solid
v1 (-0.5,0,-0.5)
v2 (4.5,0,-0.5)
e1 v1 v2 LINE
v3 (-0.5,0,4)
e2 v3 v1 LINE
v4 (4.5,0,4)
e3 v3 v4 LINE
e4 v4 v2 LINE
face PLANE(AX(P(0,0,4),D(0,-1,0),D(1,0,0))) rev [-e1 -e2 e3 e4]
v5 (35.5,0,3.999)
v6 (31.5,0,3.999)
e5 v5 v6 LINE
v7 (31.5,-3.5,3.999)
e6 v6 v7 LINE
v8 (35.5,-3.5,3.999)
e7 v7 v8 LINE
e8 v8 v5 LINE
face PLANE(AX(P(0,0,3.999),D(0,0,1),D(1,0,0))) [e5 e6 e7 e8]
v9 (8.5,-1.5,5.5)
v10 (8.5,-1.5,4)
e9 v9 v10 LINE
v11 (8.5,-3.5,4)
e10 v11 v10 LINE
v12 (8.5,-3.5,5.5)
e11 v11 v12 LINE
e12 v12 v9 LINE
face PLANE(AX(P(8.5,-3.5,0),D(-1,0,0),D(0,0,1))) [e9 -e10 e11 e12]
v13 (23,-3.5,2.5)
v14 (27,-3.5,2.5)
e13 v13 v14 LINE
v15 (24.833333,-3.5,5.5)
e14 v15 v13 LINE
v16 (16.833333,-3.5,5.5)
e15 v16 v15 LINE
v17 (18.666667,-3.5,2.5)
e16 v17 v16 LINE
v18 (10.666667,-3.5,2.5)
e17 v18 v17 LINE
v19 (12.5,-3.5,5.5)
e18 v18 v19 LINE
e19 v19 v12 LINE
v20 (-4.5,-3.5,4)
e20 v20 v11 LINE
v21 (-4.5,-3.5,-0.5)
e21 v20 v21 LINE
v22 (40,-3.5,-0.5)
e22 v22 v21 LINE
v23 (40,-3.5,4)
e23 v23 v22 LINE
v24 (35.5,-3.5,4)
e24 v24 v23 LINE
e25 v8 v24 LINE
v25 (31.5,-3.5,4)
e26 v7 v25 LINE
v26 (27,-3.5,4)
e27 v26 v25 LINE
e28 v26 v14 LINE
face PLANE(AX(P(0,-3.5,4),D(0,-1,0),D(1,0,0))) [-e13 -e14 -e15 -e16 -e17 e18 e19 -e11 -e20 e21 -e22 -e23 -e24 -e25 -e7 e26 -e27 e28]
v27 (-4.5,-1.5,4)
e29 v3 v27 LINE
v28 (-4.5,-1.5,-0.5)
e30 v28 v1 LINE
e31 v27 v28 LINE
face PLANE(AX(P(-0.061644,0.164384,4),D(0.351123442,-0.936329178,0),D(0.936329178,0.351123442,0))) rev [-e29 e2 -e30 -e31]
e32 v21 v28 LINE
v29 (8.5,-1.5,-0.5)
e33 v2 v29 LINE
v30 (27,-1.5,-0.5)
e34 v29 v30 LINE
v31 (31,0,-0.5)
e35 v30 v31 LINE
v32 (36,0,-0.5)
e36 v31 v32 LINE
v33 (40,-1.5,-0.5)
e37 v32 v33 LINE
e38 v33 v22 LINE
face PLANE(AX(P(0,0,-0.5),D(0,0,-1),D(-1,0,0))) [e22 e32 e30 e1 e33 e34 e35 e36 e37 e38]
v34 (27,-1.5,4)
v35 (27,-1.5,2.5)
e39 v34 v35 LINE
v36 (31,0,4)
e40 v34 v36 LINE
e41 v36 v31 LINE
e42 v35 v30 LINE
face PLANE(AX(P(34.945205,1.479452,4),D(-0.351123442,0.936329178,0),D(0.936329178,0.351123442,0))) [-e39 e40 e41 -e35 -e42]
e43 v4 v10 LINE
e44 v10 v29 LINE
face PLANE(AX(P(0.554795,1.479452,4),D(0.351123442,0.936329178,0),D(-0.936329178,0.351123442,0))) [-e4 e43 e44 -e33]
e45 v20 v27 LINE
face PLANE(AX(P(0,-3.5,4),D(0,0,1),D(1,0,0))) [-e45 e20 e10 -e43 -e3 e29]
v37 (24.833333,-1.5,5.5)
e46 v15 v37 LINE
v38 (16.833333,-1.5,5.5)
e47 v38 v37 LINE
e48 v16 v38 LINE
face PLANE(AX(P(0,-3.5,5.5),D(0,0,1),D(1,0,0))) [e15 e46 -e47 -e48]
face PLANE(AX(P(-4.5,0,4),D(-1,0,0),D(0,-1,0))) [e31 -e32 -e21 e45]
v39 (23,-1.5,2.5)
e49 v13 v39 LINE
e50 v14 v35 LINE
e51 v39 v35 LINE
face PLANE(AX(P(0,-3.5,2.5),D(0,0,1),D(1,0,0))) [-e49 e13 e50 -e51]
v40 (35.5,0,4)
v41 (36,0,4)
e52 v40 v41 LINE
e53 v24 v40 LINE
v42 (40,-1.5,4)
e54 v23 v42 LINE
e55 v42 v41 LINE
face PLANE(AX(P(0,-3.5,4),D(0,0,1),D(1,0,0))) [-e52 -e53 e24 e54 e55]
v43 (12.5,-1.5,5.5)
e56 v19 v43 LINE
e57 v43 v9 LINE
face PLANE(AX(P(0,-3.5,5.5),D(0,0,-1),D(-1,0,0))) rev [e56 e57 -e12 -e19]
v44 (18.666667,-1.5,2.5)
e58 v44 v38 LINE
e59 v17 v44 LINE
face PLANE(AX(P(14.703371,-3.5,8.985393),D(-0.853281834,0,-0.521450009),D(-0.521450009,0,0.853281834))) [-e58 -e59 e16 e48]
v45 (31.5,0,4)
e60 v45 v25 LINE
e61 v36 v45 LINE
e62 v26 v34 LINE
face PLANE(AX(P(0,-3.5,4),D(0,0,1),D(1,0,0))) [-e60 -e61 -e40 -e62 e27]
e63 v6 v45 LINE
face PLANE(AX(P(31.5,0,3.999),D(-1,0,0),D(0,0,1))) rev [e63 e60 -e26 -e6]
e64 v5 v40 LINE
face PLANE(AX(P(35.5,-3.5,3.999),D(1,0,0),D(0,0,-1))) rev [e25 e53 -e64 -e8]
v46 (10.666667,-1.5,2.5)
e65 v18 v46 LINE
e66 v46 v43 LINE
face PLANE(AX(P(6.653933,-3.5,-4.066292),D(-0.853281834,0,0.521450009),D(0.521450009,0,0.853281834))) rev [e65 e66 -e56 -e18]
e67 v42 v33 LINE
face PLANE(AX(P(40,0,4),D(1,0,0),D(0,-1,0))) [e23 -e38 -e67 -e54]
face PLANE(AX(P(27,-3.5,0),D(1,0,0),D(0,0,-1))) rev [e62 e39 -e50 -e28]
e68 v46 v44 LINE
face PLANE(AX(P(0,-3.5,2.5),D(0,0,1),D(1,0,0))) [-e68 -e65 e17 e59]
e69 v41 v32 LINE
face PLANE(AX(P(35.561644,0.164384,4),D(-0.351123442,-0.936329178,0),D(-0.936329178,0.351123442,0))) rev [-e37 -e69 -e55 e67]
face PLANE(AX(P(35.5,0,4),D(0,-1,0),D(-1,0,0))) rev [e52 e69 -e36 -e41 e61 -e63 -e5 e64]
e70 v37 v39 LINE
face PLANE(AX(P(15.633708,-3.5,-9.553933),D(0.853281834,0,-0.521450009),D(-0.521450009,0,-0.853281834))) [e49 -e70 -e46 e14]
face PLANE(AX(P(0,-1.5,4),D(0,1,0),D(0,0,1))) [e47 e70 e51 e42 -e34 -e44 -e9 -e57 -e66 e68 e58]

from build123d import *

# Parameters (mm, degrees)
EXTRUDE_1_DEPTH     = 4
CUT_EXTRUDE_START   = -2
CUT_EXTRUDE_6_DEPTH = 3.5
EXTRUDE_2_DEPTH     = 0.5
SKETCH_8_W          = 4
SKETCH_8_H          = 3.5
CUT_EXTRUDE_7_DEPTH = 0.001


# Read off the part's stored shape, not the designer's step: the extrude step
with BuildPart() as part:
    # 草图4 → 凸台-拉伸1 (new body)
    with BuildSketch(Plane.XY):
        Polygon((17.75, -1.5), (8.5, -1.5), (4.5, 0), (4, 0), (0, 0), (-0.5, 0), (-4.5, -1.5), (-4.5, -3.5), (17.75, -3.5), align=None)
    extrude(amount=EXTRUDE_1_DEPTH)

    # 镜向1: part across plane


with BuildPart() as part_1:
    add(part.part)
    add(part.part.mirror(Plane.XY.offset(4)))

    # 镜向2: part across plane


with BuildPart() as part_2:
    add(part_1.part)
    add(part_1.part.mirror(Plane(origin=(17.75, 0, 4), x_dir=(0, 0, 1), z_dir=(1, 0, 0))))

    # 切除-拉伸6 outline → 切除-拉伸6 (cut)
    with BuildSketch(Plane(origin=(0, -1.5, 0), x_dir=(1, 0, 0), z_dir=(0, 1, 0)).offset(CUT_EXTRUDE_START)):
        Polygon((8.5, -4), (-4.5, -4), (-4.5, -8), (40, -8), (40, -4), (27, -4), (27, -2.5), (23, -2.5), (24.833333333, -5.5), (16.833333333, -5.5), (18.666666667, -2.5), (10.666666667, -2.5), (12.5, -5.5), (8.5, -5.5), align=None)
    extrude(amount=CUT_EXTRUDE_6_DEPTH, mode=Mode.SUBTRACT)

    # 草图7 → 凸台-拉伸2 (add)
    with BuildSketch(Plane(origin=(0, 0, 0), x_dir=(-1, 0, 0), z_dir=(0, 0, -1))):
        Polygon((0.5, 0), (-4.5, 0), (-8.5, -1.5), (-27, -1.5), (-31, 0), (-36, 0), (-40, -1.5), (-40, -3.5), (4.5, -3.5), (4.5, -1.5), align=None)
    extrude(amount=EXTRUDE_2_DEPTH)

    # 草图8 → 切除-拉伸7 (cut)
    with BuildSketch(Plane.XY.offset(4)):
        with Locations((33.5, -1.75)):
            Rectangle(SKETCH_8_W, SKETCH_8_H)
    extrude(amount=-CUT_EXTRUDE_7_DEPTH, mode=Mode.SUBTRACT)


solid = part_2.part
